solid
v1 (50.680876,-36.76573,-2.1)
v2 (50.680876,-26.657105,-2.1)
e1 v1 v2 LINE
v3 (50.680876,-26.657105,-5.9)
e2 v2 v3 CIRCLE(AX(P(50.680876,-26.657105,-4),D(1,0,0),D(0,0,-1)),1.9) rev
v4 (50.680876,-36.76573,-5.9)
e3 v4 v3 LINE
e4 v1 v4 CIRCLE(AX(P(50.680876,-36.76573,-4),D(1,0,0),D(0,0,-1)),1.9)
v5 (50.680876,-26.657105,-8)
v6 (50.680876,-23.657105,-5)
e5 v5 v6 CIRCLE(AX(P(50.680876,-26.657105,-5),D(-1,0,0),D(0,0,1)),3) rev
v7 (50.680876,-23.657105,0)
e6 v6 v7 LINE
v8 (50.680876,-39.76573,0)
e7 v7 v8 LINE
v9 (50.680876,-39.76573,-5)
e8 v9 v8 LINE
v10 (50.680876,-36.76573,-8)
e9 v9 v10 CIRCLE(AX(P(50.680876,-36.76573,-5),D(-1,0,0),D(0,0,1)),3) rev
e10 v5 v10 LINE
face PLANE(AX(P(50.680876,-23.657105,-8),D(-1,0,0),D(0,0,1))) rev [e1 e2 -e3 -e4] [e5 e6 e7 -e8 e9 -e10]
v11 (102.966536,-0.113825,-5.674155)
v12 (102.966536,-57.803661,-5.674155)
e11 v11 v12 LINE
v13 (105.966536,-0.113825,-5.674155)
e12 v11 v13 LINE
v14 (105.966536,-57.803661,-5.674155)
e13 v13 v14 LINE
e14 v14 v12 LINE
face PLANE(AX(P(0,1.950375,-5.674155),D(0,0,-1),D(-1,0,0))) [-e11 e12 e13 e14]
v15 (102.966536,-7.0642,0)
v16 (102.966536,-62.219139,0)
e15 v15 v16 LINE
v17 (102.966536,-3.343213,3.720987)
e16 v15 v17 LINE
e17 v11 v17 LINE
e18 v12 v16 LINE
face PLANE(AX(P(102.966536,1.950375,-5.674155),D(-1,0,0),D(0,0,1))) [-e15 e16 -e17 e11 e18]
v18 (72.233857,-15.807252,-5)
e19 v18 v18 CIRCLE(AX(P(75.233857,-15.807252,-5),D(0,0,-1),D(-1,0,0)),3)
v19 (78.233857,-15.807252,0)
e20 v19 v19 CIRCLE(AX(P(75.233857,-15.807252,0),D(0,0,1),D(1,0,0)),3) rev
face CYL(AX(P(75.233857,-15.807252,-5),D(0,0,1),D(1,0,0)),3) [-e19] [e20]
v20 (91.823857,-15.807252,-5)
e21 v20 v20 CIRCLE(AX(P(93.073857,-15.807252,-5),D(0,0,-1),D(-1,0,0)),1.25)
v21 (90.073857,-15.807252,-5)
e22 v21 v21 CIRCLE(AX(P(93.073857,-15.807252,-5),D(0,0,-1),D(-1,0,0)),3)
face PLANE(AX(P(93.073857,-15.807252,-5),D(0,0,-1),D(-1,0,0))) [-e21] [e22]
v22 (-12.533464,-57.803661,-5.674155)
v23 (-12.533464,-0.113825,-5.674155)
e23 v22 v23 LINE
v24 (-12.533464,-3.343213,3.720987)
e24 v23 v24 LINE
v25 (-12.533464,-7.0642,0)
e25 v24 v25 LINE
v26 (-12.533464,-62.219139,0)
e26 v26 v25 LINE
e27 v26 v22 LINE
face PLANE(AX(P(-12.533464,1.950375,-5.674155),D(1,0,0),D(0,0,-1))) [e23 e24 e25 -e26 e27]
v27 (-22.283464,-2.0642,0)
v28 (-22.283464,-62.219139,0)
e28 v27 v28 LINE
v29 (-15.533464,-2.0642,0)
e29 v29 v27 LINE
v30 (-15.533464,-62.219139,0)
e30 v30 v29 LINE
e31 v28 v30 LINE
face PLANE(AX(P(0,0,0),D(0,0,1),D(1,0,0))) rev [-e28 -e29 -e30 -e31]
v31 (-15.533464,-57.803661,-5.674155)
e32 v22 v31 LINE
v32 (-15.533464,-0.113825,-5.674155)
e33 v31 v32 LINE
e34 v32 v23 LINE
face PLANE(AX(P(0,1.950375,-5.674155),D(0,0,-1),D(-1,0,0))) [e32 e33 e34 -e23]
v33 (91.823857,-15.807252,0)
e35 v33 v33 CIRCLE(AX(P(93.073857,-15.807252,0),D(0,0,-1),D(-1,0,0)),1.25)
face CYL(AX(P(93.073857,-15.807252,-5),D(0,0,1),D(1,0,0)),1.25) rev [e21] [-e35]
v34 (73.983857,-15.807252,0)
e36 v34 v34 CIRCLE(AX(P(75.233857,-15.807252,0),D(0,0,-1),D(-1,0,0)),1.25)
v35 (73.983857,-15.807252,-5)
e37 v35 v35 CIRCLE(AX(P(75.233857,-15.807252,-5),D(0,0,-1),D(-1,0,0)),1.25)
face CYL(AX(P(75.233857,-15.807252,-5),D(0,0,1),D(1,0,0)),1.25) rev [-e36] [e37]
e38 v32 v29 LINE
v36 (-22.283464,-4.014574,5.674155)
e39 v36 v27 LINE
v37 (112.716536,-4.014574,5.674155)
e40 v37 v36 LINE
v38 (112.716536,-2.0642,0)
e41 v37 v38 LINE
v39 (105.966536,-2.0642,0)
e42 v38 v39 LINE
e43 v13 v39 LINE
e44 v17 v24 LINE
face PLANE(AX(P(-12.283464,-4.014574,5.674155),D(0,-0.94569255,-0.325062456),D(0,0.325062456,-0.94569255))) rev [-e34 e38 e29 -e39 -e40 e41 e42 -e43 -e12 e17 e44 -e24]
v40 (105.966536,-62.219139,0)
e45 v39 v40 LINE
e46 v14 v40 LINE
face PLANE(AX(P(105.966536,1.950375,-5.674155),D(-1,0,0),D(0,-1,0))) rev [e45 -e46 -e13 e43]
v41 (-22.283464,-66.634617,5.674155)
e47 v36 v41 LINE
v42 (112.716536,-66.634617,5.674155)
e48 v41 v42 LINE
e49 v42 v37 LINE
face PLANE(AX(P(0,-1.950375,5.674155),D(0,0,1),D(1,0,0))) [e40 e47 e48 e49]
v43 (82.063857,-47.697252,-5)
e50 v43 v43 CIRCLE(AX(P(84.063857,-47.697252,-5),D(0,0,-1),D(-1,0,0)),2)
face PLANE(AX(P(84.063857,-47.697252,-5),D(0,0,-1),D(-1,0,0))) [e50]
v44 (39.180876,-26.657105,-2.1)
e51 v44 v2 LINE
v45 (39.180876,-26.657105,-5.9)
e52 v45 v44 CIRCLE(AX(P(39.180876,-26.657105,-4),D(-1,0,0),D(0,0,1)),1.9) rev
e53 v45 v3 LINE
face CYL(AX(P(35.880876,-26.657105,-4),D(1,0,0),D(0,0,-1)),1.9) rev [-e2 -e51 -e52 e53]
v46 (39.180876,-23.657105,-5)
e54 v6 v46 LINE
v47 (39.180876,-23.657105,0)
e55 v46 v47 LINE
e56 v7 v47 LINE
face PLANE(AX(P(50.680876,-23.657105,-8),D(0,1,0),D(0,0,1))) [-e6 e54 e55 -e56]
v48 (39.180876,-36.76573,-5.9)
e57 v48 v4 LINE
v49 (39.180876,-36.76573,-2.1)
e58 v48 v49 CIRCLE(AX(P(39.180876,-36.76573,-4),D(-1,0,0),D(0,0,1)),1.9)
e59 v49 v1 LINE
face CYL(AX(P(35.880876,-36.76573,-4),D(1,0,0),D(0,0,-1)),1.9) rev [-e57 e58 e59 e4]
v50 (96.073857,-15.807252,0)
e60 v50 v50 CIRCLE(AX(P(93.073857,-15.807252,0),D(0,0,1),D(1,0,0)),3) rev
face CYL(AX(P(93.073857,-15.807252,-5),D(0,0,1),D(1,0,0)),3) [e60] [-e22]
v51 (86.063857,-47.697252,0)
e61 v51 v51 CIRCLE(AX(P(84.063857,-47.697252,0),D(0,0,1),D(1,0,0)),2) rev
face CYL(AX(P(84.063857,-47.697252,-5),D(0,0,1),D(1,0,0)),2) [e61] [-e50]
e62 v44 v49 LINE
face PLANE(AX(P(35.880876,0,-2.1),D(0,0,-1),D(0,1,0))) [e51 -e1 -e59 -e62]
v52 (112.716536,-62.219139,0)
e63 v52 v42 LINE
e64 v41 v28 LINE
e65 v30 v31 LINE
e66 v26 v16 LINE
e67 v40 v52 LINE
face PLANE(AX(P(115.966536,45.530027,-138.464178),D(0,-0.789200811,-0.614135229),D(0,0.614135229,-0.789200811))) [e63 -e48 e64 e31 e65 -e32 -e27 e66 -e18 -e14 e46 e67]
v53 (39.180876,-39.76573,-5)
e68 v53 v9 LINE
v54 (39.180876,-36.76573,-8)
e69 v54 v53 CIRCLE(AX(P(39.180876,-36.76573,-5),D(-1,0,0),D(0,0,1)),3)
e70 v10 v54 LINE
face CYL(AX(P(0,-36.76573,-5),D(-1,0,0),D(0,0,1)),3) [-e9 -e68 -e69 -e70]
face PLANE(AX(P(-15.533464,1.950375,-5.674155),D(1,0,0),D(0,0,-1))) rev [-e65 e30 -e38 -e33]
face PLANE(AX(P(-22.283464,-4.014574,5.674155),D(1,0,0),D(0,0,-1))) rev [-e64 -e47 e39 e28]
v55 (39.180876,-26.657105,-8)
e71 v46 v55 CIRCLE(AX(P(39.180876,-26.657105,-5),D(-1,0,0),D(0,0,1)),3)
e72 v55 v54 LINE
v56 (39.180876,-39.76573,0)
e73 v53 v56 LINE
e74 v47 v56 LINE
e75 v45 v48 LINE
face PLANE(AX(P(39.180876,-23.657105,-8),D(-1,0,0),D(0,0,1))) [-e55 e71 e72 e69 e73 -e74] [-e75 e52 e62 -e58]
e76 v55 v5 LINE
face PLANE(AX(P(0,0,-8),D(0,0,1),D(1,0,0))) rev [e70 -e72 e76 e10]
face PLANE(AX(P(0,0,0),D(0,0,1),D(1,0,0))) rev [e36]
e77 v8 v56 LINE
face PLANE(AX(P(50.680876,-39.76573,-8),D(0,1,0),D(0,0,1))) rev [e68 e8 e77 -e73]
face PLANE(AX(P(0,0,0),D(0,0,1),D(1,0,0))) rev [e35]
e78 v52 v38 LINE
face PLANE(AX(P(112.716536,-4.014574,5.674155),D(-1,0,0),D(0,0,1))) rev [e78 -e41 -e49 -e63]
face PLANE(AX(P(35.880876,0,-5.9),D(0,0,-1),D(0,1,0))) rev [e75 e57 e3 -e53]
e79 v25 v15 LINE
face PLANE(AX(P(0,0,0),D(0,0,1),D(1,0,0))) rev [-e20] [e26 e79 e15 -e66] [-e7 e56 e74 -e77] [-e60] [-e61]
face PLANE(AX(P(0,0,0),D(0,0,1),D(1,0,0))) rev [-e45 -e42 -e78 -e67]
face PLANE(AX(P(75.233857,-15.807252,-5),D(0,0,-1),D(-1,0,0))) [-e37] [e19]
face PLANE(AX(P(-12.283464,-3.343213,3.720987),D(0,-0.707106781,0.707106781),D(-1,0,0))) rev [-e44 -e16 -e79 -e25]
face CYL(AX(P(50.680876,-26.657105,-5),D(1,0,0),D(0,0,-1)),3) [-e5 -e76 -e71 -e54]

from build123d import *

# Parameters (mm, degrees)
SALIENTE_EXTRUIR1_START    = -22.283463782
SALIENTE_EXTRUIR1_DEPTH    = 135
SALIENTE_EXTRUIR2_START    = -15.533463782
SALIENTE_EXTRUIR2_DEPTH    = 121.5
SALIENTE_EXTRUIR2_2_DEPTH  = 3
SALIENTE_EXTRUIR2_START_2  = 102.966536218
SALIENTE_EXTRUIR2_3_DEPTH  = 3
CORTAR_EXTRUIR1_DEPTH      = 10
CORTAR_EXTRUIR1_DEPTH_BACK = 148
CHAFL_N1_SIZE              = 5
CHAFL_N1_SIZE2             = 3.934668741
CROQUIS5_W                 = 11.5
CROQUIS5_H                 = 16.108624933
SALIENTE_EXTRUIR3_DEPTH    = 8
CORTAR_EXTRUIR2_DEPTH      = 14.8
REDONDEO1_R                = 3
CROQUIS7_R                 = 2
CROQUIS7_R_2               = 3
CROQUIS7_R_3               = 1.25
SALIENTE_EXTRUIR4_DEPTH    = 5


# Read off the part's stored shape, not the designer's step: Saliente-Extruir1, Saliente-Extruir2
with BuildPart() as part:
    # Saliente-Extruir1 outline → Saliente-Extruir1 (new body)
    with BuildSketch(Plane.YZ.offset(SALIENTE_EXTRUIR1_START)):
        Polygon((-75.458190571, 5.674155302), (-73.507815836, 0), (-2.064199728, 0), (-4.014574463, 5.674155302), align=None)
    extrude(amount=SALIENTE_EXTRUIR1_DEPTH)

    # Saliente-Extruir2 outline → Saliente-Extruir2 (add)
    with BuildSketch(Plane.YZ.offset(SALIENTE_EXTRUIR2_START)):
        Polygon((-63.757815836, 0), (-66.757815836, 0), (-64.807441101, -5.674155302), (-61.807441101, -5.674155302), align=None)
    extrude(amount=SALIENTE_EXTRUIR2_DEPTH)

    # Saliente-Extruir2 2 outline → Saliente-Extruir2 2 (add)
    with BuildSketch(Plane.YZ.offset(SALIENTE_EXTRUIR2_START)):
        Polygon((-2.064199728, 0), (-63.757815836, 0), (-61.807441101, -5.674155302), (-0.113824993, -5.674155302), align=None)
    extrude(amount=SALIENTE_EXTRUIR2_2_DEPTH)

    # Saliente-Extruir2 3 outline → Saliente-Extruir2 3 (add)
    with BuildSketch(Plane.YZ.offset(SALIENTE_EXTRUIR2_START_2)):
        Polygon((-2.064199728, 0), (-63.757815836, 0), (-61.807441101, -5.674155302), (-0.113824993, -5.674155302), align=None)
    extrude(amount=SALIENTE_EXTRUIR2_3_DEPTH)

    # Croquis3 → Cortar-Extruir1 (cut, two sides: drawn at the far end of the back side and taken through both)
    with BuildSketch(Plane(origin=(105.966536218, 0, 0), x_dir=(0, 0, -1), z_dir=(1, 0, 0)).offset(-CORTAR_EXTRUIR1_DEPTH_BACK)):
        Polygon((137.63492959, 43.681305963), (7.625291737, -57.488760722), (7.625291737, -67.23888859), (-5.407688567, -80.271868893), (-9.341803419, -77.990953795), (-7.87522913, -69.550856699), (-8.264975448, -68.650724899), (138.464177577, 45.530026939), align=None)
    extrude(amount=CORTAR_EXTRUIR1_DEPTH + CORTAR_EXTRUIR1_DEPTH_BACK, mode=Mode.SUBTRACT)

    # Chaflán1
    chafl_n1_edges = [part.edges().sort_by_distance(p)[0] for p in [
        (45.216536218, -2.064199728, 0),
    ]]
    chafl_n1_side = [part.faces().sort_by_distance(p)[0] for p in [
        (45.216536218, -32.141669504, 0),
    ]]
    chamfer(chafl_n1_edges, length=CHAFL_N1_SIZE, length2=CHAFL_N1_SIZE2, reference=chafl_n1_side[0])

    # Croquis5 → Saliente-Extruir3 (add)
    with BuildSketch(Plane(origin=(0, 0, 0), x_dir=(-1, 0, 0), z_dir=(0, 0, -1))):
        with Locations((-44.930876317, -31.711417234)):
            Rectangle(CROQUIS5_W, CROQUIS5_H)
    extrude(amount=SALIENTE_EXTRUIR3_DEPTH)

    # Croquis6 → Cortar-Extruir2 (cut)
    with BuildSketch(Plane(origin=(50.680876317, 0, 0), x_dir=(0, 0, -1), z_dir=(1, 0, 0))):
        with BuildLine():
            Line((5.9, -36.7657297), (5.9, -26.657104767))
            ThreePointArc((5.9, -26.657104767), (4, -24.757104767), (2.1, -26.657104767))
            Line((2.1, -26.657104767), (2.1, -36.7657297))
            ThreePointArc((2.1, -36.7657297), (4, -38.6657297), (5.9, -36.7657297))
        make_face()
    extrude(amount=-CORTAR_EXTRUIR2_DEPTH, mode=Mode.SUBTRACT)

    # Redondeo1
    redondeo1_edges = [part.edges().sort_by_distance(p)[0] for p in [
        (44.930876317, -23.657104767, -8),
        (44.930876317, -39.7657297, -8),
    ]]
    fillet(redondeo1_edges, radius=REDONDEO1_R)

    # Croquis7 → Saliente-Extruir4 (add)
    # profile 1 of 3: a face of its own
    with BuildSketch(Plane(origin=(0, 0, 0), x_dir=(-1, 0, 0), z_dir=(0, 0, -1))):
        with Locations(Location((-84.06385674, -47.697252062, 0), (0, 0, 180))):
            Circle(CROQUIS7_R)
    # profile 2 of 3: a face of its own
    with BuildSketch(Plane(origin=(0, 0, 0), x_dir=(-1, 0, 0), z_dir=(0, 0, -1))):
        with Locations(Location((-93.07385674, -15.807252062, 0), (0, 0, 180))):
            Circle(CROQUIS7_R_2)
        with Locations((-93.07385674, -15.807252062)):
            Circle(CROQUIS7_R_3, mode=Mode.SUBTRACT)
    # profile 3 of 3: a face of its own
    with BuildSketch(Plane(origin=(0, 0, 0), x_dir=(-1, 0, 0), z_dir=(0, 0, -1))):
        with Locations(Location((-75.23385674, -15.807252062, 0), (0, 0, 180))):
            Circle(CROQUIS7_R_2)
        with Locations((-75.23385674, -15.807252062)):
            Circle(CROQUIS7_R_3, mode=Mode.SUBTRACT)
    extrude(amount=SALIENTE_EXTRUIR4_DEPTH)


solid = part.part
